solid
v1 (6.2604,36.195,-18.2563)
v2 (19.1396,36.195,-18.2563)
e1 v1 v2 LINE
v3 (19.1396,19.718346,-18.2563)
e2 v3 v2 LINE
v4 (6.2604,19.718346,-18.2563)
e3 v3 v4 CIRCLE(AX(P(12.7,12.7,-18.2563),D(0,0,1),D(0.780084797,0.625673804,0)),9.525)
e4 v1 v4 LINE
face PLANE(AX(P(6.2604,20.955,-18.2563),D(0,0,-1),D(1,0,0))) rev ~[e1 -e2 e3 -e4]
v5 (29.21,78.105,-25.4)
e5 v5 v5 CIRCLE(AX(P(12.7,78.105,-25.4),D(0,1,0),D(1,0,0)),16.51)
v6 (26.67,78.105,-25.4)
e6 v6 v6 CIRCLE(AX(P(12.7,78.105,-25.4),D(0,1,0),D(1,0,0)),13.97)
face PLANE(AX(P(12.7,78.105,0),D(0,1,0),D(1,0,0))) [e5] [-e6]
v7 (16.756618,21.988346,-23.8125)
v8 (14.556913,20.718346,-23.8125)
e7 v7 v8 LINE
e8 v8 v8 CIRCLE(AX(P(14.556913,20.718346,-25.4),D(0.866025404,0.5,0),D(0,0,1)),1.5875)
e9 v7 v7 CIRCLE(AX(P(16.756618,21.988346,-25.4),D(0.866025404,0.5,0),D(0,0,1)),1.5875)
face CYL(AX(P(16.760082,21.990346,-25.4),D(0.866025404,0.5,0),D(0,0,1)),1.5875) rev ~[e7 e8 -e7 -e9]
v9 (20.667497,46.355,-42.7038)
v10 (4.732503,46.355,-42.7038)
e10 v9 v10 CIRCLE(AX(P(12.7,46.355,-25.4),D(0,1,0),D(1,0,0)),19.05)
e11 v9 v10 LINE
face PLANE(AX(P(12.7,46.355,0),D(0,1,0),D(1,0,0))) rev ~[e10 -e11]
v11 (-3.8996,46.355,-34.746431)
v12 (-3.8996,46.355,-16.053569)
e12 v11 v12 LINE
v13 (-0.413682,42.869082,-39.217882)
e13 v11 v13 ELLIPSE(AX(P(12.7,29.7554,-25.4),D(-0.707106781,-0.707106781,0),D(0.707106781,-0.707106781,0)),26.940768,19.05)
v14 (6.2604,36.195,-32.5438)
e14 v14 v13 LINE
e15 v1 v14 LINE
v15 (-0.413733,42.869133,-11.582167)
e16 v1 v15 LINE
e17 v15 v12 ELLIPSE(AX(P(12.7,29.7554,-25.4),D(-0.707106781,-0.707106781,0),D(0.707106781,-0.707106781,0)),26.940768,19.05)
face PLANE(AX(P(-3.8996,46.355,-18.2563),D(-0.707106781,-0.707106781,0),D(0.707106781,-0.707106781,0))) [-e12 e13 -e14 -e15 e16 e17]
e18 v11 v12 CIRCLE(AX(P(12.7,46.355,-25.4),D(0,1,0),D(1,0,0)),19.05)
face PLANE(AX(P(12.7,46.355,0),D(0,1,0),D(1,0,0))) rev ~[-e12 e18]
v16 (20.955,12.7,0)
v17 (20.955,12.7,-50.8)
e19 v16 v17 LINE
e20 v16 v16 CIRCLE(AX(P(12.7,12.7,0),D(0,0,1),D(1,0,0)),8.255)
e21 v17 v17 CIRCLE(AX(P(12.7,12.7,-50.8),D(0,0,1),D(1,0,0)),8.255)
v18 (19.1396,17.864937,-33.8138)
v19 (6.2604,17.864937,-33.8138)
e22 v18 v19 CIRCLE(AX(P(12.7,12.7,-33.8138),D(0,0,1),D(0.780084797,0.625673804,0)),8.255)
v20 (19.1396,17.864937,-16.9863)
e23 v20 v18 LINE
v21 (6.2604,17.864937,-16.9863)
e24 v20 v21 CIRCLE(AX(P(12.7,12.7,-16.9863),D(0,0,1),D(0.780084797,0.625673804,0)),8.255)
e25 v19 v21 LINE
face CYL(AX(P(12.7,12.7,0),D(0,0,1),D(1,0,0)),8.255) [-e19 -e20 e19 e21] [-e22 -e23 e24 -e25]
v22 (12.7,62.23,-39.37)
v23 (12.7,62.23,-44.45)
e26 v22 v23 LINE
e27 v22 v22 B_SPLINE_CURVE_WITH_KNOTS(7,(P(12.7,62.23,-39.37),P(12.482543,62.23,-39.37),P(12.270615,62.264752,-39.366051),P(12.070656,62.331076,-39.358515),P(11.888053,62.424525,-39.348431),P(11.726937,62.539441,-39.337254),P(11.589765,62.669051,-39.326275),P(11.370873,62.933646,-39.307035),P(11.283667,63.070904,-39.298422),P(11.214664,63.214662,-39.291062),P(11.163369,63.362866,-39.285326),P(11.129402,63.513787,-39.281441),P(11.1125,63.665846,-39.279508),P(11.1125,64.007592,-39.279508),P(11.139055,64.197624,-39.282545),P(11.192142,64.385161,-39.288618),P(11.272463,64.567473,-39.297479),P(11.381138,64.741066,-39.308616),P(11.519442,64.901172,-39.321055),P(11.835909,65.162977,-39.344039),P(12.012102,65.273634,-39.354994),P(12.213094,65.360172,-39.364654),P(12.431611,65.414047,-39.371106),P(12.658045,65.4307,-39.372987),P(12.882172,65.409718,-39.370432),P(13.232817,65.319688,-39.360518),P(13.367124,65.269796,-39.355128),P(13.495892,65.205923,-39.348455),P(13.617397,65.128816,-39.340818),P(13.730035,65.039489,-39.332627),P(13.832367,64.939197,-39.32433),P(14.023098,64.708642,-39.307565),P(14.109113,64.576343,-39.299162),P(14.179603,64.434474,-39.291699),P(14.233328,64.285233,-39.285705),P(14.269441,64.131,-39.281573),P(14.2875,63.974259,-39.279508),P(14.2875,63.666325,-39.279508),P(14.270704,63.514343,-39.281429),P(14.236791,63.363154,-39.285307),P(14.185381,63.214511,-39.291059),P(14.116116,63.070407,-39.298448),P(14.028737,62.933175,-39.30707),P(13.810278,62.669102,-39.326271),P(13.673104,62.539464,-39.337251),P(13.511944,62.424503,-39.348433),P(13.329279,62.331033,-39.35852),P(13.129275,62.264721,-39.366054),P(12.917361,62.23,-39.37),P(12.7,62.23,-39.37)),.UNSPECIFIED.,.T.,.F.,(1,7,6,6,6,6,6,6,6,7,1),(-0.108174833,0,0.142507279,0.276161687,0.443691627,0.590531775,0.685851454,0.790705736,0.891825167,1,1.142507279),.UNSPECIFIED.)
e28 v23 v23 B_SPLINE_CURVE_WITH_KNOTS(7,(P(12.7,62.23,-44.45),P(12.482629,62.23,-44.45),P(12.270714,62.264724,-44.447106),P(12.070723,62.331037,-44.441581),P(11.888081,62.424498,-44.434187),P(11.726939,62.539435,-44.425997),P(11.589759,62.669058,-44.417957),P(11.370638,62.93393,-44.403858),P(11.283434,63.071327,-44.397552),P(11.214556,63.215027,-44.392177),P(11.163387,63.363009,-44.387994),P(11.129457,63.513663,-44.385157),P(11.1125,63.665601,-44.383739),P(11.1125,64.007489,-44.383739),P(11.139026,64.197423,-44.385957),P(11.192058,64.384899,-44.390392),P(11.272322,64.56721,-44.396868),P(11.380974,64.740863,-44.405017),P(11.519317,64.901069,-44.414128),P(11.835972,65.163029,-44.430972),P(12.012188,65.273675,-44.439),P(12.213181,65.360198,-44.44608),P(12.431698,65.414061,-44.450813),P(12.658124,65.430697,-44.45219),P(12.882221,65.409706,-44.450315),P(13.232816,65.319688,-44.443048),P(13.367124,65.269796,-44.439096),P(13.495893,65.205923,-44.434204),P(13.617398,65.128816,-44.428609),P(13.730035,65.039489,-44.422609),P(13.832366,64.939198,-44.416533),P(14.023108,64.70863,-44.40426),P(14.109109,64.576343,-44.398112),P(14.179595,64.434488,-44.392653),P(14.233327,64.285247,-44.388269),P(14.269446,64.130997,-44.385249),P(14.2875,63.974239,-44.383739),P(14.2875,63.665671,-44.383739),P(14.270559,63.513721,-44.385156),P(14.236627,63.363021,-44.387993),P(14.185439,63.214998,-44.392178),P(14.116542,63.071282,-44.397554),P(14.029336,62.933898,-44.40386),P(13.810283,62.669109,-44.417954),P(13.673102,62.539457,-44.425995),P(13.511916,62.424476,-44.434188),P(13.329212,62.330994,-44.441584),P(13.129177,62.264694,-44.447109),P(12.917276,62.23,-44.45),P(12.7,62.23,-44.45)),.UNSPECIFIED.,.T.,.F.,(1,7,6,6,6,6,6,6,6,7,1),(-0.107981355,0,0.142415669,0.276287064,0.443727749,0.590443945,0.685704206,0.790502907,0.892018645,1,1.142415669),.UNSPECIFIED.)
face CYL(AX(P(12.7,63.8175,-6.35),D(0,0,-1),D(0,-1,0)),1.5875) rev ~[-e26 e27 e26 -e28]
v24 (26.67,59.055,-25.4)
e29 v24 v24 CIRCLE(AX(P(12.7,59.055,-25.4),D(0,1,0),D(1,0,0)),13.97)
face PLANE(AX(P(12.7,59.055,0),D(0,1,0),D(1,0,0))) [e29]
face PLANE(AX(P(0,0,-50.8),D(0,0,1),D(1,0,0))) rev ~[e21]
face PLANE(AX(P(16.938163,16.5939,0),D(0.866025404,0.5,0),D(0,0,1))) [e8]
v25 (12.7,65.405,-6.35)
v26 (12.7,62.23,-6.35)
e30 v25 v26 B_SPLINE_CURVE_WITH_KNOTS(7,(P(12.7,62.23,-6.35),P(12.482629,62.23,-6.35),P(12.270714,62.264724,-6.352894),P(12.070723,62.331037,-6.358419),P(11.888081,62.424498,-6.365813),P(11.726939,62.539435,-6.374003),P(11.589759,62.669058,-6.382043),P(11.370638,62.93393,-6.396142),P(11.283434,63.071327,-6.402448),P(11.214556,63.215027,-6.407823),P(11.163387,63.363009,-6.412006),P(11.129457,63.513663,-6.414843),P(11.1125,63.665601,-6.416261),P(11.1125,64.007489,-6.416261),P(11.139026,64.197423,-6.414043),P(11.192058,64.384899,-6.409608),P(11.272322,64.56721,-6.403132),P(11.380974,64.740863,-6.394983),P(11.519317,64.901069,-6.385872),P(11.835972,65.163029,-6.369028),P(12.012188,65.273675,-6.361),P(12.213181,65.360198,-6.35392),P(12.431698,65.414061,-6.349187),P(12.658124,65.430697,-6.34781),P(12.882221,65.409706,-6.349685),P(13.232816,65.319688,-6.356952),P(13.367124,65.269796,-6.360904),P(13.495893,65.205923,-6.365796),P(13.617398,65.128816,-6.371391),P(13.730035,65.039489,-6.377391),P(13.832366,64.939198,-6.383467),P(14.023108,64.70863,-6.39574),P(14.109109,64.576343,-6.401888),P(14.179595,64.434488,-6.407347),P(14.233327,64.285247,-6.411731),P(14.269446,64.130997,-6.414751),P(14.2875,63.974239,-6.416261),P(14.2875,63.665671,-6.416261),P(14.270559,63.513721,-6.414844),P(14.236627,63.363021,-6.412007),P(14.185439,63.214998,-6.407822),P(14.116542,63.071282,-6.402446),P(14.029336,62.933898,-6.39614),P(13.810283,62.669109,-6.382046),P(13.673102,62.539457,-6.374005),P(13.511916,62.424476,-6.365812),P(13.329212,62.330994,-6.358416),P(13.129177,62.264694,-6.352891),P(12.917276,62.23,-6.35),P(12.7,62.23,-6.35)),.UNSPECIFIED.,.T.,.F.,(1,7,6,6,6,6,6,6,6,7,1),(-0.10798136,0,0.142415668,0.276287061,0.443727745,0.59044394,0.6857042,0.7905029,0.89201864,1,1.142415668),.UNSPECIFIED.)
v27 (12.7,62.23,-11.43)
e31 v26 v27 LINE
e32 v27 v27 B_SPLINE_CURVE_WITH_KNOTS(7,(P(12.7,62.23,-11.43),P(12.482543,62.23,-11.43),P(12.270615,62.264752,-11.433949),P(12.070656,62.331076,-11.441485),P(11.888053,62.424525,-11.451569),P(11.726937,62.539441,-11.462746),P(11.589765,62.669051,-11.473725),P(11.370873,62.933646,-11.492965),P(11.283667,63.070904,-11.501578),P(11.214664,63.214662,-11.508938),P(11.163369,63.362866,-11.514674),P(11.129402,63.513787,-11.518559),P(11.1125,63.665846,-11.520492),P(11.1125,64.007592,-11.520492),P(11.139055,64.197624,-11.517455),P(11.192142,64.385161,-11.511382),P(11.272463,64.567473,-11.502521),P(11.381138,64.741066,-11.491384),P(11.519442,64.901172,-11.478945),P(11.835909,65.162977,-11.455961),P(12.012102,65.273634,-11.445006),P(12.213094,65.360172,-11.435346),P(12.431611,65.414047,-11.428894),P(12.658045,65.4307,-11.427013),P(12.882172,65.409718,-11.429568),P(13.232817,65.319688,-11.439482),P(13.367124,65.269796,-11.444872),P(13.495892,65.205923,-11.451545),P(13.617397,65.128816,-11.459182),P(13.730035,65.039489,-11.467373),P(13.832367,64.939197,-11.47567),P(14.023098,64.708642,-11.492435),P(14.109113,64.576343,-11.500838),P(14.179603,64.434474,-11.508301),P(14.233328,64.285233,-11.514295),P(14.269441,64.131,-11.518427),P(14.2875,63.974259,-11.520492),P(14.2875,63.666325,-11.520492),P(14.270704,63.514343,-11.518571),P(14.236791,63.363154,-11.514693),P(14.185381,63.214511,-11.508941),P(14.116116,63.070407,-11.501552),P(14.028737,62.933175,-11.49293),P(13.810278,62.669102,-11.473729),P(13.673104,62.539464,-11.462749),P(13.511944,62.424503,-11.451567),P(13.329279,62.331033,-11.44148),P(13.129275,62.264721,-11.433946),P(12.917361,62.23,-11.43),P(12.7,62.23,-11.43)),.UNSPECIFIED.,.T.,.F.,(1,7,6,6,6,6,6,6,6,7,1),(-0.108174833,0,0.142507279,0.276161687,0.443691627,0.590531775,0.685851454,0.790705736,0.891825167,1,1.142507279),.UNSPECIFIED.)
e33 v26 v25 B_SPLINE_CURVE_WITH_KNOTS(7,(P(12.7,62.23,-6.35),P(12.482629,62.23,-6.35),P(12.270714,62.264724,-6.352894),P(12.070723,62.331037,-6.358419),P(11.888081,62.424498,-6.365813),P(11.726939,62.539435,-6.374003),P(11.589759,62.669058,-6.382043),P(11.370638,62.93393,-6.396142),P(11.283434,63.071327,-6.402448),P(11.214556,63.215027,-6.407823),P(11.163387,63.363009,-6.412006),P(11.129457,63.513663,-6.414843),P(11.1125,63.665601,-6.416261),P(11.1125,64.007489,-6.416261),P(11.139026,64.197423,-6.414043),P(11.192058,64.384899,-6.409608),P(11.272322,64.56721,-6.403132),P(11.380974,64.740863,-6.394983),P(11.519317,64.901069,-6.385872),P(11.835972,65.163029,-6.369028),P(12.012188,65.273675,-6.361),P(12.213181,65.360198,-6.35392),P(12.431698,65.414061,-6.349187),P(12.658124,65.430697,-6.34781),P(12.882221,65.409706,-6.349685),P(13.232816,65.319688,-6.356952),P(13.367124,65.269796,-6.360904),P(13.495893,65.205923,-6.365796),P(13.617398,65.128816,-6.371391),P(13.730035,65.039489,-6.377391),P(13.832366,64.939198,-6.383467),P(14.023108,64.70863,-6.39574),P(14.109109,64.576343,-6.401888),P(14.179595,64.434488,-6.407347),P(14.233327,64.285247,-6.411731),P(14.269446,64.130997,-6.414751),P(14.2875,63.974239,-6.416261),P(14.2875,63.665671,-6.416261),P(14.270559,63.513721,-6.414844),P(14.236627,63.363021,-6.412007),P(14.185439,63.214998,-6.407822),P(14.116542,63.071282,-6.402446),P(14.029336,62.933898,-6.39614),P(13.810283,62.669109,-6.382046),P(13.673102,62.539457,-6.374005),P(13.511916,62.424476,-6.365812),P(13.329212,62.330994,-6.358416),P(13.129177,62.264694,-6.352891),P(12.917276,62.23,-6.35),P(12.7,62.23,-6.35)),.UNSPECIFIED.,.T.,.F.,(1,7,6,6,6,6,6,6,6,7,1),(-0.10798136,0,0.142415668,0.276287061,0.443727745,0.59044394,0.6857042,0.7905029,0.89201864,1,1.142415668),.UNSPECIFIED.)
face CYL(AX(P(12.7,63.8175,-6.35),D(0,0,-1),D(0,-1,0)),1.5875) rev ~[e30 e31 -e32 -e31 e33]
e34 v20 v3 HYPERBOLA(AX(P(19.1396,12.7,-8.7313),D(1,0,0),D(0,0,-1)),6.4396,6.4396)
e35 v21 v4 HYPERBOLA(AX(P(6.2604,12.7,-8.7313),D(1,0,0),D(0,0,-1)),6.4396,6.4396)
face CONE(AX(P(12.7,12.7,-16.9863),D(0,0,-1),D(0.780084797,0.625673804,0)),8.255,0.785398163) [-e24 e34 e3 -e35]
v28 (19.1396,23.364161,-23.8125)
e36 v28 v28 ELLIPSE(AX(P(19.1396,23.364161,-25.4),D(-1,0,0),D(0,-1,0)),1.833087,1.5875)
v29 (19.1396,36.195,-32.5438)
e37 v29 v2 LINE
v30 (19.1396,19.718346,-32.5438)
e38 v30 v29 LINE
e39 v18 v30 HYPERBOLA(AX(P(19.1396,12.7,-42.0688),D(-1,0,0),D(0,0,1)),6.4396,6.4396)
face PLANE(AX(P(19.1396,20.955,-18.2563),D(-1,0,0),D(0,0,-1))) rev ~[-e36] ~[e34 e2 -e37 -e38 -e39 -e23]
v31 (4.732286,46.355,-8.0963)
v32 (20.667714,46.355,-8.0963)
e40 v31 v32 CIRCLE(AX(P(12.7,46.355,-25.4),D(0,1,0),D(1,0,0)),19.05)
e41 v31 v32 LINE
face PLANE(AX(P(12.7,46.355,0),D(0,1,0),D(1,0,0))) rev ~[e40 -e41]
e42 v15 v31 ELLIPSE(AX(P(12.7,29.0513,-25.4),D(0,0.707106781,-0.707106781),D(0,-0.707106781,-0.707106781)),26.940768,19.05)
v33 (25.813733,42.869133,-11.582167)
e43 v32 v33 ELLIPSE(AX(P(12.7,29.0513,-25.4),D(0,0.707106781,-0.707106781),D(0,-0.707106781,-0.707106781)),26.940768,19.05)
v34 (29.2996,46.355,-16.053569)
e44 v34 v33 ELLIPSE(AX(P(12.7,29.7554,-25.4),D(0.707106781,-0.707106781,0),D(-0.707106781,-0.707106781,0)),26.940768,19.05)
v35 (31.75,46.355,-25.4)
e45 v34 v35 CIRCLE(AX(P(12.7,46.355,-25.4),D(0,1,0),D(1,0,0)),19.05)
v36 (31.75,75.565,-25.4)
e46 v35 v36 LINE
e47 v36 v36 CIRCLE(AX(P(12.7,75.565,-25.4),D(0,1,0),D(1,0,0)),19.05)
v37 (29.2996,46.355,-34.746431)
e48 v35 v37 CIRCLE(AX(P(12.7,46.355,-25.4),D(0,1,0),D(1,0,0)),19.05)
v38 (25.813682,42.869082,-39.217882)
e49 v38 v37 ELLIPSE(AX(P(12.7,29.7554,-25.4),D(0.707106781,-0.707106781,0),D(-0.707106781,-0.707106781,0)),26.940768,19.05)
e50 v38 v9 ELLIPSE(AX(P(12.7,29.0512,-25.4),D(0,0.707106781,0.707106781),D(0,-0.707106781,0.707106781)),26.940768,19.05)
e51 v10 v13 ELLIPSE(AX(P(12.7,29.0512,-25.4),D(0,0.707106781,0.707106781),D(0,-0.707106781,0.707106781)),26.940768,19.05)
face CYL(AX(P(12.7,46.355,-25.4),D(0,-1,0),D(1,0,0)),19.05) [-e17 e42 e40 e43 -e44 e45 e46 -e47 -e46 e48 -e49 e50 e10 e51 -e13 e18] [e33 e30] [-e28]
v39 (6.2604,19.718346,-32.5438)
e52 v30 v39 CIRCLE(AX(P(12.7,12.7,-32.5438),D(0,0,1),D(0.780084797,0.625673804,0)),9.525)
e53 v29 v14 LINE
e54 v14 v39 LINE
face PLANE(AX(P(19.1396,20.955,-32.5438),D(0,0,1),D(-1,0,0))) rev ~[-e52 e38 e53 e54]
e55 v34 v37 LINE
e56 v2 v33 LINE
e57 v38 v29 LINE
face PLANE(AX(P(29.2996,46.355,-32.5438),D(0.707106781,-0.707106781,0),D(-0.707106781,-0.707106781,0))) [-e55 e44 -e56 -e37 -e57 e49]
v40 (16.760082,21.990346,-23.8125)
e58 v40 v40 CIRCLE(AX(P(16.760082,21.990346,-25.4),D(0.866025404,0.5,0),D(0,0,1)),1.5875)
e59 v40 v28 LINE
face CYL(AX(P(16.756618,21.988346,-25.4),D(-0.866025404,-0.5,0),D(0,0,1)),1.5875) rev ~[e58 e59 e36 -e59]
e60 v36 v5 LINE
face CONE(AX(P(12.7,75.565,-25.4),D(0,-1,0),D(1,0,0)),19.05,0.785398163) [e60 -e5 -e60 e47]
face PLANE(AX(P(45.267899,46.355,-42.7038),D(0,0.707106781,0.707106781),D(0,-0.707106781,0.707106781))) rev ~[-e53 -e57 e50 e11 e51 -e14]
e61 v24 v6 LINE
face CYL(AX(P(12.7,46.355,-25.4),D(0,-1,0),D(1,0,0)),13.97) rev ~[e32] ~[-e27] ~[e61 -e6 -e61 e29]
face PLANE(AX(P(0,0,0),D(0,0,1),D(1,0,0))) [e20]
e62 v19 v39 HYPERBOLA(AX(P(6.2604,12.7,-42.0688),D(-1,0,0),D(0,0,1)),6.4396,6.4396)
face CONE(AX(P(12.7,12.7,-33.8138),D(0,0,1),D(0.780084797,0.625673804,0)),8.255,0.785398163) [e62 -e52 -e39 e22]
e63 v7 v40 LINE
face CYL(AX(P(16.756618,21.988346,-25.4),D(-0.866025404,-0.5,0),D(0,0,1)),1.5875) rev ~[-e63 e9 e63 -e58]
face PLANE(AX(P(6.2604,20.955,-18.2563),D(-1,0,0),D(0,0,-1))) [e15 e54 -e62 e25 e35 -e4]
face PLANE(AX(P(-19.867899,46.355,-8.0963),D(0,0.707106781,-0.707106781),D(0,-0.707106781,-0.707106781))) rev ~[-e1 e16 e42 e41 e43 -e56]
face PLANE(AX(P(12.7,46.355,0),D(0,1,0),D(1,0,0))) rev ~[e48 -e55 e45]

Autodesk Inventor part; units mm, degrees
ref_plane "YZ Plane" through (0, 0, 0) normal (1, 0, 0) x (0, 1, 0)
sketch "Sketch1" plane through (0, 0, 0) normal (0, 0, 1) x (1, 0, 0)
  arc A0 (6.35, 20.6311) -> (19.05, 20.6311) centre (12.7, 12.7) ccw projected
  circle A1 centre (12.7, 12.7) radius 8.255
  point P0 (0, 0)
  dimension "d0" = 16.51
extrude "Extrusion1" add sketch "Sketch1" against normal blind 50.8
ref_plane "Work Plane1" through (12.7, 20.955, 0) normal (0, 1, 0) x (-1, 0, 0)
sketch "Sketch2" plane through (12.7, 20.955, 0) normal (0, 1, 0) x (-1, 0, 0)
  line L0 (6.35, -15.875) -> (12.7, -15.875) projected
  line L1 (-12.7, -15.875) -> (-6.35, -15.875) projected
  line L2 (-6.35, -34.925) -> (-12.7, -34.925) projected
  line L3 (12.7, -34.925) -> (6.35, -34.925) projected
  line L4 (-8.255, -50.8) -> (8.255, -50.8) projected
  line L5 (-8.255, 0) -> (8.255, 0) projected
  line L6 (-6.4396, -15.875) -> (-6.4396, -34.925)
  line L7 (-6.4396, -34.925) -> (-6.4396, -25.4)
  line L8 (-6.4396, -34.925) -> (-6.4396, -30.1625)
  line L9 (6.4396, -15.875) -> (6.4396, -34.925)
  line L10 (6.4396, -25.4) -> (6.4396, -15.875)
  line L11 (6.4396, -20.6375) -> (6.4396, -15.875)
  line L12 (-6.4396, -32.5438) -> (6.4396, -32.5438)
  line L13 (6.4396, -32.5438) -> (6.4396, -18.2563)
  line L14 (6.4396, -18.2563) -> (-6.4396, -18.2563)
  line L15 (-6.4396, -18.2563) -> (-6.4396, -32.5438)
  point P0 (12.7, 0)
extrude "Extrusion2" add sketch "Sketch2" along normal blind 25.4 and the other way blind 8.255
chamfer "Chamfer1" distance 1.27 angle 45 2 edges at (12.7, 20.955, -18.2563) (12.7, 20.955, -32.5438)
sketch "Sketch3" plane through (12.7, 46.355, 0) normal (0, 1, 0) x (1, 0, 0)
  line L0 (6.4396, 32.5438) -> (-6.4396, 32.5438) projected
  line L1 (-6.4396, 32.5438) -> (-6.4396, 18.2563) projected
  line L2 (-6.4396, 18.2563) -> (6.4396, 18.2563) projected
  line L3 (6.4396, 18.2563) -> (6.4396, 32.5438) projected
  line L4 (-6.4396, 18.2563) -> (6.4396, 32.5438)
  line L5 (6.4396, 18.2563) -> (-6.4396, 32.5438)
  circle A0 centre (0, 25.4) radius 19.05
  circle A1 centre (0, 25.4) radius 13.97
  point P0 (-12.7, 0)
  dimension "d11" = 38.1
  dimension "d12" = 27.94
extrude "Extrusion3" add sketch "Sketch3" along normal blind 12.7 contours L4 L5 L0 | L3 L5 L4 | L5 L4 L1 | L2 L4 L5 | A1
extrude "Extrusion4" add sketch "Sketch3" along normal blind 31.75 contours A0
chamfer "Chamfer2" distance 10.16 angle 45 4 edges at (6.2604, 46.355, -25.4) (12.7, 46.355, -18.2563) (19.1396, 46.355, -25.4) (12.7, 46.355, -32.5438)
chamfer "Chamfer3" distance 2.54 angle 45 1 edges at (-6.35, 78.105, -25.4)
ref_plane "Work Plane2" through (4.445, 12.7, 0) normal (1, 0, 0) x (0, 1, 0)
sketch "Sketch4" plane through (19.1396, 17.8649, -16.9863) normal (1, 0, 0) x (0, 0, -1)
  line L0 (1.27, 18.3301) -> (15.5575, 18.3301) projected
  line L1 (1.27, 1.8534) -> (1.27, 18.3301) projected
  line L2 (16.8275, 0) -> (0, 0) projected
  line L3 (15.5575, 18.3301) -> (15.5575, 1.8534) projected
  line L4 (1.27, 1.8534) -> (15.5575, 1.8534)
  line L5 (8.4138, 1.8534) -> (8.4138, 4.3934)
  circle A0 centre (8.4138, 4.3934) radius 1.5875
  point P0 (-16.9863, -17.8649)
  dimension "d23" = 2.54
  dimension "d24" = 3.175
ref_plane "Work Plane3" through (19.1396, 17.8649, 0) normal (0.8660254, 0.5, 0) x (0, 0, 1)
sketch "Sketch5" plane through (19.1396, 17.8649, 0) normal (0.8660254, 0.5, 0) x (0, 0, 1)
  circle A0 centre (-25.4, -4.7625) radius 1.5875
  point P0 (0, 5.9017)
  dimension "d26" = 3.175
extrude "Extrusion5" cut sketch "Sketch5" along normal blind 12.7 and the other way blind 2.54
ref_plane "Work Plane4" through (12.7, 46.355, -6.35) normal (0, 0, 1) x (1, 0, 0)
sketch "Sketch6" plane through (12.7, 46.355, -6.35) normal (0, 0, 1) x (1, 0, 0)
  line L0 (16.5996, 0) -> (16.5996, 0) projected
  line L1 (16.5996, 0) -> (13.1137, -3.4859) projected
  arc A0 (13.1137, -3.4859) -> (7.9676, 0) centre (0, -17.3038) ccw projected
  line L2 (-7.9676, 0) -> (7.9676, 0) projected
  arc A1 (-7.9676, 0) -> (-13.1137, -3.4859) centre (0, -17.3038) ccw projected
  line L3 (-13.1137, -3.4859) -> (-16.5996, 0) projected
  line L4 (-16.5996, 0) -> (-16.5996, 0) projected
  line L5 (-16.5996, 0) -> (-13.1137, -3.4859) projected
  arc A2 (-7.9676, 0) -> (-13.1137, -3.4859) centre (0, -17.3038) ccw projected
  line L6 (7.9676, 0) -> (-7.9676, 0) projected
  arc A3 (13.1137, -3.4859) -> (7.9676, 0) centre (0, -17.3038) ccw projected
  line L7 (13.1137, -3.4859) -> (16.5996, 0) projected
  line L8 (19.05, 29.21) -> (-19.05, 29.21) projected
  line L9 (-19.05, 0) -> (-19.05, 29.21) projected
  line L10 (19.05, 0) -> (19.05, 29.21) projected
  line L11 (-19.05, 17.4625) -> (19.05, 17.4625)
  circle A4 centre (0, 17.4625) radius 1.5875
  point P0 (-12.7, -46.355)
  dimension "d31" = 3.175
hole "Hole1" at (12.7, 63.8175, -6.35) direction (0, 0, -1) diameter 3.175 end through all
ref_plane "Work Plane5" through (-240.4986, 445.264, 133.3441) normal (-0.8660254, -0.5, 0) x (-0.0199098, 0.0344847, -0.9992069)
sketch "Sketch7" plane through (-240.4986, 445.264, 133.3441) normal (-0.8660254, -0.5, 0) x (-0.0199098, 0.0344847, -0.9992069)
  circle A0 centre (25.4, -6.35) radius 1.5875
  point P0 (113.0953, 510.7677)
  dimension "d39" = 3.175
extrude "Extrusion6" cut sketch "Sketch7" against normal blind 12.7
properties part number "wrist-forearm"
